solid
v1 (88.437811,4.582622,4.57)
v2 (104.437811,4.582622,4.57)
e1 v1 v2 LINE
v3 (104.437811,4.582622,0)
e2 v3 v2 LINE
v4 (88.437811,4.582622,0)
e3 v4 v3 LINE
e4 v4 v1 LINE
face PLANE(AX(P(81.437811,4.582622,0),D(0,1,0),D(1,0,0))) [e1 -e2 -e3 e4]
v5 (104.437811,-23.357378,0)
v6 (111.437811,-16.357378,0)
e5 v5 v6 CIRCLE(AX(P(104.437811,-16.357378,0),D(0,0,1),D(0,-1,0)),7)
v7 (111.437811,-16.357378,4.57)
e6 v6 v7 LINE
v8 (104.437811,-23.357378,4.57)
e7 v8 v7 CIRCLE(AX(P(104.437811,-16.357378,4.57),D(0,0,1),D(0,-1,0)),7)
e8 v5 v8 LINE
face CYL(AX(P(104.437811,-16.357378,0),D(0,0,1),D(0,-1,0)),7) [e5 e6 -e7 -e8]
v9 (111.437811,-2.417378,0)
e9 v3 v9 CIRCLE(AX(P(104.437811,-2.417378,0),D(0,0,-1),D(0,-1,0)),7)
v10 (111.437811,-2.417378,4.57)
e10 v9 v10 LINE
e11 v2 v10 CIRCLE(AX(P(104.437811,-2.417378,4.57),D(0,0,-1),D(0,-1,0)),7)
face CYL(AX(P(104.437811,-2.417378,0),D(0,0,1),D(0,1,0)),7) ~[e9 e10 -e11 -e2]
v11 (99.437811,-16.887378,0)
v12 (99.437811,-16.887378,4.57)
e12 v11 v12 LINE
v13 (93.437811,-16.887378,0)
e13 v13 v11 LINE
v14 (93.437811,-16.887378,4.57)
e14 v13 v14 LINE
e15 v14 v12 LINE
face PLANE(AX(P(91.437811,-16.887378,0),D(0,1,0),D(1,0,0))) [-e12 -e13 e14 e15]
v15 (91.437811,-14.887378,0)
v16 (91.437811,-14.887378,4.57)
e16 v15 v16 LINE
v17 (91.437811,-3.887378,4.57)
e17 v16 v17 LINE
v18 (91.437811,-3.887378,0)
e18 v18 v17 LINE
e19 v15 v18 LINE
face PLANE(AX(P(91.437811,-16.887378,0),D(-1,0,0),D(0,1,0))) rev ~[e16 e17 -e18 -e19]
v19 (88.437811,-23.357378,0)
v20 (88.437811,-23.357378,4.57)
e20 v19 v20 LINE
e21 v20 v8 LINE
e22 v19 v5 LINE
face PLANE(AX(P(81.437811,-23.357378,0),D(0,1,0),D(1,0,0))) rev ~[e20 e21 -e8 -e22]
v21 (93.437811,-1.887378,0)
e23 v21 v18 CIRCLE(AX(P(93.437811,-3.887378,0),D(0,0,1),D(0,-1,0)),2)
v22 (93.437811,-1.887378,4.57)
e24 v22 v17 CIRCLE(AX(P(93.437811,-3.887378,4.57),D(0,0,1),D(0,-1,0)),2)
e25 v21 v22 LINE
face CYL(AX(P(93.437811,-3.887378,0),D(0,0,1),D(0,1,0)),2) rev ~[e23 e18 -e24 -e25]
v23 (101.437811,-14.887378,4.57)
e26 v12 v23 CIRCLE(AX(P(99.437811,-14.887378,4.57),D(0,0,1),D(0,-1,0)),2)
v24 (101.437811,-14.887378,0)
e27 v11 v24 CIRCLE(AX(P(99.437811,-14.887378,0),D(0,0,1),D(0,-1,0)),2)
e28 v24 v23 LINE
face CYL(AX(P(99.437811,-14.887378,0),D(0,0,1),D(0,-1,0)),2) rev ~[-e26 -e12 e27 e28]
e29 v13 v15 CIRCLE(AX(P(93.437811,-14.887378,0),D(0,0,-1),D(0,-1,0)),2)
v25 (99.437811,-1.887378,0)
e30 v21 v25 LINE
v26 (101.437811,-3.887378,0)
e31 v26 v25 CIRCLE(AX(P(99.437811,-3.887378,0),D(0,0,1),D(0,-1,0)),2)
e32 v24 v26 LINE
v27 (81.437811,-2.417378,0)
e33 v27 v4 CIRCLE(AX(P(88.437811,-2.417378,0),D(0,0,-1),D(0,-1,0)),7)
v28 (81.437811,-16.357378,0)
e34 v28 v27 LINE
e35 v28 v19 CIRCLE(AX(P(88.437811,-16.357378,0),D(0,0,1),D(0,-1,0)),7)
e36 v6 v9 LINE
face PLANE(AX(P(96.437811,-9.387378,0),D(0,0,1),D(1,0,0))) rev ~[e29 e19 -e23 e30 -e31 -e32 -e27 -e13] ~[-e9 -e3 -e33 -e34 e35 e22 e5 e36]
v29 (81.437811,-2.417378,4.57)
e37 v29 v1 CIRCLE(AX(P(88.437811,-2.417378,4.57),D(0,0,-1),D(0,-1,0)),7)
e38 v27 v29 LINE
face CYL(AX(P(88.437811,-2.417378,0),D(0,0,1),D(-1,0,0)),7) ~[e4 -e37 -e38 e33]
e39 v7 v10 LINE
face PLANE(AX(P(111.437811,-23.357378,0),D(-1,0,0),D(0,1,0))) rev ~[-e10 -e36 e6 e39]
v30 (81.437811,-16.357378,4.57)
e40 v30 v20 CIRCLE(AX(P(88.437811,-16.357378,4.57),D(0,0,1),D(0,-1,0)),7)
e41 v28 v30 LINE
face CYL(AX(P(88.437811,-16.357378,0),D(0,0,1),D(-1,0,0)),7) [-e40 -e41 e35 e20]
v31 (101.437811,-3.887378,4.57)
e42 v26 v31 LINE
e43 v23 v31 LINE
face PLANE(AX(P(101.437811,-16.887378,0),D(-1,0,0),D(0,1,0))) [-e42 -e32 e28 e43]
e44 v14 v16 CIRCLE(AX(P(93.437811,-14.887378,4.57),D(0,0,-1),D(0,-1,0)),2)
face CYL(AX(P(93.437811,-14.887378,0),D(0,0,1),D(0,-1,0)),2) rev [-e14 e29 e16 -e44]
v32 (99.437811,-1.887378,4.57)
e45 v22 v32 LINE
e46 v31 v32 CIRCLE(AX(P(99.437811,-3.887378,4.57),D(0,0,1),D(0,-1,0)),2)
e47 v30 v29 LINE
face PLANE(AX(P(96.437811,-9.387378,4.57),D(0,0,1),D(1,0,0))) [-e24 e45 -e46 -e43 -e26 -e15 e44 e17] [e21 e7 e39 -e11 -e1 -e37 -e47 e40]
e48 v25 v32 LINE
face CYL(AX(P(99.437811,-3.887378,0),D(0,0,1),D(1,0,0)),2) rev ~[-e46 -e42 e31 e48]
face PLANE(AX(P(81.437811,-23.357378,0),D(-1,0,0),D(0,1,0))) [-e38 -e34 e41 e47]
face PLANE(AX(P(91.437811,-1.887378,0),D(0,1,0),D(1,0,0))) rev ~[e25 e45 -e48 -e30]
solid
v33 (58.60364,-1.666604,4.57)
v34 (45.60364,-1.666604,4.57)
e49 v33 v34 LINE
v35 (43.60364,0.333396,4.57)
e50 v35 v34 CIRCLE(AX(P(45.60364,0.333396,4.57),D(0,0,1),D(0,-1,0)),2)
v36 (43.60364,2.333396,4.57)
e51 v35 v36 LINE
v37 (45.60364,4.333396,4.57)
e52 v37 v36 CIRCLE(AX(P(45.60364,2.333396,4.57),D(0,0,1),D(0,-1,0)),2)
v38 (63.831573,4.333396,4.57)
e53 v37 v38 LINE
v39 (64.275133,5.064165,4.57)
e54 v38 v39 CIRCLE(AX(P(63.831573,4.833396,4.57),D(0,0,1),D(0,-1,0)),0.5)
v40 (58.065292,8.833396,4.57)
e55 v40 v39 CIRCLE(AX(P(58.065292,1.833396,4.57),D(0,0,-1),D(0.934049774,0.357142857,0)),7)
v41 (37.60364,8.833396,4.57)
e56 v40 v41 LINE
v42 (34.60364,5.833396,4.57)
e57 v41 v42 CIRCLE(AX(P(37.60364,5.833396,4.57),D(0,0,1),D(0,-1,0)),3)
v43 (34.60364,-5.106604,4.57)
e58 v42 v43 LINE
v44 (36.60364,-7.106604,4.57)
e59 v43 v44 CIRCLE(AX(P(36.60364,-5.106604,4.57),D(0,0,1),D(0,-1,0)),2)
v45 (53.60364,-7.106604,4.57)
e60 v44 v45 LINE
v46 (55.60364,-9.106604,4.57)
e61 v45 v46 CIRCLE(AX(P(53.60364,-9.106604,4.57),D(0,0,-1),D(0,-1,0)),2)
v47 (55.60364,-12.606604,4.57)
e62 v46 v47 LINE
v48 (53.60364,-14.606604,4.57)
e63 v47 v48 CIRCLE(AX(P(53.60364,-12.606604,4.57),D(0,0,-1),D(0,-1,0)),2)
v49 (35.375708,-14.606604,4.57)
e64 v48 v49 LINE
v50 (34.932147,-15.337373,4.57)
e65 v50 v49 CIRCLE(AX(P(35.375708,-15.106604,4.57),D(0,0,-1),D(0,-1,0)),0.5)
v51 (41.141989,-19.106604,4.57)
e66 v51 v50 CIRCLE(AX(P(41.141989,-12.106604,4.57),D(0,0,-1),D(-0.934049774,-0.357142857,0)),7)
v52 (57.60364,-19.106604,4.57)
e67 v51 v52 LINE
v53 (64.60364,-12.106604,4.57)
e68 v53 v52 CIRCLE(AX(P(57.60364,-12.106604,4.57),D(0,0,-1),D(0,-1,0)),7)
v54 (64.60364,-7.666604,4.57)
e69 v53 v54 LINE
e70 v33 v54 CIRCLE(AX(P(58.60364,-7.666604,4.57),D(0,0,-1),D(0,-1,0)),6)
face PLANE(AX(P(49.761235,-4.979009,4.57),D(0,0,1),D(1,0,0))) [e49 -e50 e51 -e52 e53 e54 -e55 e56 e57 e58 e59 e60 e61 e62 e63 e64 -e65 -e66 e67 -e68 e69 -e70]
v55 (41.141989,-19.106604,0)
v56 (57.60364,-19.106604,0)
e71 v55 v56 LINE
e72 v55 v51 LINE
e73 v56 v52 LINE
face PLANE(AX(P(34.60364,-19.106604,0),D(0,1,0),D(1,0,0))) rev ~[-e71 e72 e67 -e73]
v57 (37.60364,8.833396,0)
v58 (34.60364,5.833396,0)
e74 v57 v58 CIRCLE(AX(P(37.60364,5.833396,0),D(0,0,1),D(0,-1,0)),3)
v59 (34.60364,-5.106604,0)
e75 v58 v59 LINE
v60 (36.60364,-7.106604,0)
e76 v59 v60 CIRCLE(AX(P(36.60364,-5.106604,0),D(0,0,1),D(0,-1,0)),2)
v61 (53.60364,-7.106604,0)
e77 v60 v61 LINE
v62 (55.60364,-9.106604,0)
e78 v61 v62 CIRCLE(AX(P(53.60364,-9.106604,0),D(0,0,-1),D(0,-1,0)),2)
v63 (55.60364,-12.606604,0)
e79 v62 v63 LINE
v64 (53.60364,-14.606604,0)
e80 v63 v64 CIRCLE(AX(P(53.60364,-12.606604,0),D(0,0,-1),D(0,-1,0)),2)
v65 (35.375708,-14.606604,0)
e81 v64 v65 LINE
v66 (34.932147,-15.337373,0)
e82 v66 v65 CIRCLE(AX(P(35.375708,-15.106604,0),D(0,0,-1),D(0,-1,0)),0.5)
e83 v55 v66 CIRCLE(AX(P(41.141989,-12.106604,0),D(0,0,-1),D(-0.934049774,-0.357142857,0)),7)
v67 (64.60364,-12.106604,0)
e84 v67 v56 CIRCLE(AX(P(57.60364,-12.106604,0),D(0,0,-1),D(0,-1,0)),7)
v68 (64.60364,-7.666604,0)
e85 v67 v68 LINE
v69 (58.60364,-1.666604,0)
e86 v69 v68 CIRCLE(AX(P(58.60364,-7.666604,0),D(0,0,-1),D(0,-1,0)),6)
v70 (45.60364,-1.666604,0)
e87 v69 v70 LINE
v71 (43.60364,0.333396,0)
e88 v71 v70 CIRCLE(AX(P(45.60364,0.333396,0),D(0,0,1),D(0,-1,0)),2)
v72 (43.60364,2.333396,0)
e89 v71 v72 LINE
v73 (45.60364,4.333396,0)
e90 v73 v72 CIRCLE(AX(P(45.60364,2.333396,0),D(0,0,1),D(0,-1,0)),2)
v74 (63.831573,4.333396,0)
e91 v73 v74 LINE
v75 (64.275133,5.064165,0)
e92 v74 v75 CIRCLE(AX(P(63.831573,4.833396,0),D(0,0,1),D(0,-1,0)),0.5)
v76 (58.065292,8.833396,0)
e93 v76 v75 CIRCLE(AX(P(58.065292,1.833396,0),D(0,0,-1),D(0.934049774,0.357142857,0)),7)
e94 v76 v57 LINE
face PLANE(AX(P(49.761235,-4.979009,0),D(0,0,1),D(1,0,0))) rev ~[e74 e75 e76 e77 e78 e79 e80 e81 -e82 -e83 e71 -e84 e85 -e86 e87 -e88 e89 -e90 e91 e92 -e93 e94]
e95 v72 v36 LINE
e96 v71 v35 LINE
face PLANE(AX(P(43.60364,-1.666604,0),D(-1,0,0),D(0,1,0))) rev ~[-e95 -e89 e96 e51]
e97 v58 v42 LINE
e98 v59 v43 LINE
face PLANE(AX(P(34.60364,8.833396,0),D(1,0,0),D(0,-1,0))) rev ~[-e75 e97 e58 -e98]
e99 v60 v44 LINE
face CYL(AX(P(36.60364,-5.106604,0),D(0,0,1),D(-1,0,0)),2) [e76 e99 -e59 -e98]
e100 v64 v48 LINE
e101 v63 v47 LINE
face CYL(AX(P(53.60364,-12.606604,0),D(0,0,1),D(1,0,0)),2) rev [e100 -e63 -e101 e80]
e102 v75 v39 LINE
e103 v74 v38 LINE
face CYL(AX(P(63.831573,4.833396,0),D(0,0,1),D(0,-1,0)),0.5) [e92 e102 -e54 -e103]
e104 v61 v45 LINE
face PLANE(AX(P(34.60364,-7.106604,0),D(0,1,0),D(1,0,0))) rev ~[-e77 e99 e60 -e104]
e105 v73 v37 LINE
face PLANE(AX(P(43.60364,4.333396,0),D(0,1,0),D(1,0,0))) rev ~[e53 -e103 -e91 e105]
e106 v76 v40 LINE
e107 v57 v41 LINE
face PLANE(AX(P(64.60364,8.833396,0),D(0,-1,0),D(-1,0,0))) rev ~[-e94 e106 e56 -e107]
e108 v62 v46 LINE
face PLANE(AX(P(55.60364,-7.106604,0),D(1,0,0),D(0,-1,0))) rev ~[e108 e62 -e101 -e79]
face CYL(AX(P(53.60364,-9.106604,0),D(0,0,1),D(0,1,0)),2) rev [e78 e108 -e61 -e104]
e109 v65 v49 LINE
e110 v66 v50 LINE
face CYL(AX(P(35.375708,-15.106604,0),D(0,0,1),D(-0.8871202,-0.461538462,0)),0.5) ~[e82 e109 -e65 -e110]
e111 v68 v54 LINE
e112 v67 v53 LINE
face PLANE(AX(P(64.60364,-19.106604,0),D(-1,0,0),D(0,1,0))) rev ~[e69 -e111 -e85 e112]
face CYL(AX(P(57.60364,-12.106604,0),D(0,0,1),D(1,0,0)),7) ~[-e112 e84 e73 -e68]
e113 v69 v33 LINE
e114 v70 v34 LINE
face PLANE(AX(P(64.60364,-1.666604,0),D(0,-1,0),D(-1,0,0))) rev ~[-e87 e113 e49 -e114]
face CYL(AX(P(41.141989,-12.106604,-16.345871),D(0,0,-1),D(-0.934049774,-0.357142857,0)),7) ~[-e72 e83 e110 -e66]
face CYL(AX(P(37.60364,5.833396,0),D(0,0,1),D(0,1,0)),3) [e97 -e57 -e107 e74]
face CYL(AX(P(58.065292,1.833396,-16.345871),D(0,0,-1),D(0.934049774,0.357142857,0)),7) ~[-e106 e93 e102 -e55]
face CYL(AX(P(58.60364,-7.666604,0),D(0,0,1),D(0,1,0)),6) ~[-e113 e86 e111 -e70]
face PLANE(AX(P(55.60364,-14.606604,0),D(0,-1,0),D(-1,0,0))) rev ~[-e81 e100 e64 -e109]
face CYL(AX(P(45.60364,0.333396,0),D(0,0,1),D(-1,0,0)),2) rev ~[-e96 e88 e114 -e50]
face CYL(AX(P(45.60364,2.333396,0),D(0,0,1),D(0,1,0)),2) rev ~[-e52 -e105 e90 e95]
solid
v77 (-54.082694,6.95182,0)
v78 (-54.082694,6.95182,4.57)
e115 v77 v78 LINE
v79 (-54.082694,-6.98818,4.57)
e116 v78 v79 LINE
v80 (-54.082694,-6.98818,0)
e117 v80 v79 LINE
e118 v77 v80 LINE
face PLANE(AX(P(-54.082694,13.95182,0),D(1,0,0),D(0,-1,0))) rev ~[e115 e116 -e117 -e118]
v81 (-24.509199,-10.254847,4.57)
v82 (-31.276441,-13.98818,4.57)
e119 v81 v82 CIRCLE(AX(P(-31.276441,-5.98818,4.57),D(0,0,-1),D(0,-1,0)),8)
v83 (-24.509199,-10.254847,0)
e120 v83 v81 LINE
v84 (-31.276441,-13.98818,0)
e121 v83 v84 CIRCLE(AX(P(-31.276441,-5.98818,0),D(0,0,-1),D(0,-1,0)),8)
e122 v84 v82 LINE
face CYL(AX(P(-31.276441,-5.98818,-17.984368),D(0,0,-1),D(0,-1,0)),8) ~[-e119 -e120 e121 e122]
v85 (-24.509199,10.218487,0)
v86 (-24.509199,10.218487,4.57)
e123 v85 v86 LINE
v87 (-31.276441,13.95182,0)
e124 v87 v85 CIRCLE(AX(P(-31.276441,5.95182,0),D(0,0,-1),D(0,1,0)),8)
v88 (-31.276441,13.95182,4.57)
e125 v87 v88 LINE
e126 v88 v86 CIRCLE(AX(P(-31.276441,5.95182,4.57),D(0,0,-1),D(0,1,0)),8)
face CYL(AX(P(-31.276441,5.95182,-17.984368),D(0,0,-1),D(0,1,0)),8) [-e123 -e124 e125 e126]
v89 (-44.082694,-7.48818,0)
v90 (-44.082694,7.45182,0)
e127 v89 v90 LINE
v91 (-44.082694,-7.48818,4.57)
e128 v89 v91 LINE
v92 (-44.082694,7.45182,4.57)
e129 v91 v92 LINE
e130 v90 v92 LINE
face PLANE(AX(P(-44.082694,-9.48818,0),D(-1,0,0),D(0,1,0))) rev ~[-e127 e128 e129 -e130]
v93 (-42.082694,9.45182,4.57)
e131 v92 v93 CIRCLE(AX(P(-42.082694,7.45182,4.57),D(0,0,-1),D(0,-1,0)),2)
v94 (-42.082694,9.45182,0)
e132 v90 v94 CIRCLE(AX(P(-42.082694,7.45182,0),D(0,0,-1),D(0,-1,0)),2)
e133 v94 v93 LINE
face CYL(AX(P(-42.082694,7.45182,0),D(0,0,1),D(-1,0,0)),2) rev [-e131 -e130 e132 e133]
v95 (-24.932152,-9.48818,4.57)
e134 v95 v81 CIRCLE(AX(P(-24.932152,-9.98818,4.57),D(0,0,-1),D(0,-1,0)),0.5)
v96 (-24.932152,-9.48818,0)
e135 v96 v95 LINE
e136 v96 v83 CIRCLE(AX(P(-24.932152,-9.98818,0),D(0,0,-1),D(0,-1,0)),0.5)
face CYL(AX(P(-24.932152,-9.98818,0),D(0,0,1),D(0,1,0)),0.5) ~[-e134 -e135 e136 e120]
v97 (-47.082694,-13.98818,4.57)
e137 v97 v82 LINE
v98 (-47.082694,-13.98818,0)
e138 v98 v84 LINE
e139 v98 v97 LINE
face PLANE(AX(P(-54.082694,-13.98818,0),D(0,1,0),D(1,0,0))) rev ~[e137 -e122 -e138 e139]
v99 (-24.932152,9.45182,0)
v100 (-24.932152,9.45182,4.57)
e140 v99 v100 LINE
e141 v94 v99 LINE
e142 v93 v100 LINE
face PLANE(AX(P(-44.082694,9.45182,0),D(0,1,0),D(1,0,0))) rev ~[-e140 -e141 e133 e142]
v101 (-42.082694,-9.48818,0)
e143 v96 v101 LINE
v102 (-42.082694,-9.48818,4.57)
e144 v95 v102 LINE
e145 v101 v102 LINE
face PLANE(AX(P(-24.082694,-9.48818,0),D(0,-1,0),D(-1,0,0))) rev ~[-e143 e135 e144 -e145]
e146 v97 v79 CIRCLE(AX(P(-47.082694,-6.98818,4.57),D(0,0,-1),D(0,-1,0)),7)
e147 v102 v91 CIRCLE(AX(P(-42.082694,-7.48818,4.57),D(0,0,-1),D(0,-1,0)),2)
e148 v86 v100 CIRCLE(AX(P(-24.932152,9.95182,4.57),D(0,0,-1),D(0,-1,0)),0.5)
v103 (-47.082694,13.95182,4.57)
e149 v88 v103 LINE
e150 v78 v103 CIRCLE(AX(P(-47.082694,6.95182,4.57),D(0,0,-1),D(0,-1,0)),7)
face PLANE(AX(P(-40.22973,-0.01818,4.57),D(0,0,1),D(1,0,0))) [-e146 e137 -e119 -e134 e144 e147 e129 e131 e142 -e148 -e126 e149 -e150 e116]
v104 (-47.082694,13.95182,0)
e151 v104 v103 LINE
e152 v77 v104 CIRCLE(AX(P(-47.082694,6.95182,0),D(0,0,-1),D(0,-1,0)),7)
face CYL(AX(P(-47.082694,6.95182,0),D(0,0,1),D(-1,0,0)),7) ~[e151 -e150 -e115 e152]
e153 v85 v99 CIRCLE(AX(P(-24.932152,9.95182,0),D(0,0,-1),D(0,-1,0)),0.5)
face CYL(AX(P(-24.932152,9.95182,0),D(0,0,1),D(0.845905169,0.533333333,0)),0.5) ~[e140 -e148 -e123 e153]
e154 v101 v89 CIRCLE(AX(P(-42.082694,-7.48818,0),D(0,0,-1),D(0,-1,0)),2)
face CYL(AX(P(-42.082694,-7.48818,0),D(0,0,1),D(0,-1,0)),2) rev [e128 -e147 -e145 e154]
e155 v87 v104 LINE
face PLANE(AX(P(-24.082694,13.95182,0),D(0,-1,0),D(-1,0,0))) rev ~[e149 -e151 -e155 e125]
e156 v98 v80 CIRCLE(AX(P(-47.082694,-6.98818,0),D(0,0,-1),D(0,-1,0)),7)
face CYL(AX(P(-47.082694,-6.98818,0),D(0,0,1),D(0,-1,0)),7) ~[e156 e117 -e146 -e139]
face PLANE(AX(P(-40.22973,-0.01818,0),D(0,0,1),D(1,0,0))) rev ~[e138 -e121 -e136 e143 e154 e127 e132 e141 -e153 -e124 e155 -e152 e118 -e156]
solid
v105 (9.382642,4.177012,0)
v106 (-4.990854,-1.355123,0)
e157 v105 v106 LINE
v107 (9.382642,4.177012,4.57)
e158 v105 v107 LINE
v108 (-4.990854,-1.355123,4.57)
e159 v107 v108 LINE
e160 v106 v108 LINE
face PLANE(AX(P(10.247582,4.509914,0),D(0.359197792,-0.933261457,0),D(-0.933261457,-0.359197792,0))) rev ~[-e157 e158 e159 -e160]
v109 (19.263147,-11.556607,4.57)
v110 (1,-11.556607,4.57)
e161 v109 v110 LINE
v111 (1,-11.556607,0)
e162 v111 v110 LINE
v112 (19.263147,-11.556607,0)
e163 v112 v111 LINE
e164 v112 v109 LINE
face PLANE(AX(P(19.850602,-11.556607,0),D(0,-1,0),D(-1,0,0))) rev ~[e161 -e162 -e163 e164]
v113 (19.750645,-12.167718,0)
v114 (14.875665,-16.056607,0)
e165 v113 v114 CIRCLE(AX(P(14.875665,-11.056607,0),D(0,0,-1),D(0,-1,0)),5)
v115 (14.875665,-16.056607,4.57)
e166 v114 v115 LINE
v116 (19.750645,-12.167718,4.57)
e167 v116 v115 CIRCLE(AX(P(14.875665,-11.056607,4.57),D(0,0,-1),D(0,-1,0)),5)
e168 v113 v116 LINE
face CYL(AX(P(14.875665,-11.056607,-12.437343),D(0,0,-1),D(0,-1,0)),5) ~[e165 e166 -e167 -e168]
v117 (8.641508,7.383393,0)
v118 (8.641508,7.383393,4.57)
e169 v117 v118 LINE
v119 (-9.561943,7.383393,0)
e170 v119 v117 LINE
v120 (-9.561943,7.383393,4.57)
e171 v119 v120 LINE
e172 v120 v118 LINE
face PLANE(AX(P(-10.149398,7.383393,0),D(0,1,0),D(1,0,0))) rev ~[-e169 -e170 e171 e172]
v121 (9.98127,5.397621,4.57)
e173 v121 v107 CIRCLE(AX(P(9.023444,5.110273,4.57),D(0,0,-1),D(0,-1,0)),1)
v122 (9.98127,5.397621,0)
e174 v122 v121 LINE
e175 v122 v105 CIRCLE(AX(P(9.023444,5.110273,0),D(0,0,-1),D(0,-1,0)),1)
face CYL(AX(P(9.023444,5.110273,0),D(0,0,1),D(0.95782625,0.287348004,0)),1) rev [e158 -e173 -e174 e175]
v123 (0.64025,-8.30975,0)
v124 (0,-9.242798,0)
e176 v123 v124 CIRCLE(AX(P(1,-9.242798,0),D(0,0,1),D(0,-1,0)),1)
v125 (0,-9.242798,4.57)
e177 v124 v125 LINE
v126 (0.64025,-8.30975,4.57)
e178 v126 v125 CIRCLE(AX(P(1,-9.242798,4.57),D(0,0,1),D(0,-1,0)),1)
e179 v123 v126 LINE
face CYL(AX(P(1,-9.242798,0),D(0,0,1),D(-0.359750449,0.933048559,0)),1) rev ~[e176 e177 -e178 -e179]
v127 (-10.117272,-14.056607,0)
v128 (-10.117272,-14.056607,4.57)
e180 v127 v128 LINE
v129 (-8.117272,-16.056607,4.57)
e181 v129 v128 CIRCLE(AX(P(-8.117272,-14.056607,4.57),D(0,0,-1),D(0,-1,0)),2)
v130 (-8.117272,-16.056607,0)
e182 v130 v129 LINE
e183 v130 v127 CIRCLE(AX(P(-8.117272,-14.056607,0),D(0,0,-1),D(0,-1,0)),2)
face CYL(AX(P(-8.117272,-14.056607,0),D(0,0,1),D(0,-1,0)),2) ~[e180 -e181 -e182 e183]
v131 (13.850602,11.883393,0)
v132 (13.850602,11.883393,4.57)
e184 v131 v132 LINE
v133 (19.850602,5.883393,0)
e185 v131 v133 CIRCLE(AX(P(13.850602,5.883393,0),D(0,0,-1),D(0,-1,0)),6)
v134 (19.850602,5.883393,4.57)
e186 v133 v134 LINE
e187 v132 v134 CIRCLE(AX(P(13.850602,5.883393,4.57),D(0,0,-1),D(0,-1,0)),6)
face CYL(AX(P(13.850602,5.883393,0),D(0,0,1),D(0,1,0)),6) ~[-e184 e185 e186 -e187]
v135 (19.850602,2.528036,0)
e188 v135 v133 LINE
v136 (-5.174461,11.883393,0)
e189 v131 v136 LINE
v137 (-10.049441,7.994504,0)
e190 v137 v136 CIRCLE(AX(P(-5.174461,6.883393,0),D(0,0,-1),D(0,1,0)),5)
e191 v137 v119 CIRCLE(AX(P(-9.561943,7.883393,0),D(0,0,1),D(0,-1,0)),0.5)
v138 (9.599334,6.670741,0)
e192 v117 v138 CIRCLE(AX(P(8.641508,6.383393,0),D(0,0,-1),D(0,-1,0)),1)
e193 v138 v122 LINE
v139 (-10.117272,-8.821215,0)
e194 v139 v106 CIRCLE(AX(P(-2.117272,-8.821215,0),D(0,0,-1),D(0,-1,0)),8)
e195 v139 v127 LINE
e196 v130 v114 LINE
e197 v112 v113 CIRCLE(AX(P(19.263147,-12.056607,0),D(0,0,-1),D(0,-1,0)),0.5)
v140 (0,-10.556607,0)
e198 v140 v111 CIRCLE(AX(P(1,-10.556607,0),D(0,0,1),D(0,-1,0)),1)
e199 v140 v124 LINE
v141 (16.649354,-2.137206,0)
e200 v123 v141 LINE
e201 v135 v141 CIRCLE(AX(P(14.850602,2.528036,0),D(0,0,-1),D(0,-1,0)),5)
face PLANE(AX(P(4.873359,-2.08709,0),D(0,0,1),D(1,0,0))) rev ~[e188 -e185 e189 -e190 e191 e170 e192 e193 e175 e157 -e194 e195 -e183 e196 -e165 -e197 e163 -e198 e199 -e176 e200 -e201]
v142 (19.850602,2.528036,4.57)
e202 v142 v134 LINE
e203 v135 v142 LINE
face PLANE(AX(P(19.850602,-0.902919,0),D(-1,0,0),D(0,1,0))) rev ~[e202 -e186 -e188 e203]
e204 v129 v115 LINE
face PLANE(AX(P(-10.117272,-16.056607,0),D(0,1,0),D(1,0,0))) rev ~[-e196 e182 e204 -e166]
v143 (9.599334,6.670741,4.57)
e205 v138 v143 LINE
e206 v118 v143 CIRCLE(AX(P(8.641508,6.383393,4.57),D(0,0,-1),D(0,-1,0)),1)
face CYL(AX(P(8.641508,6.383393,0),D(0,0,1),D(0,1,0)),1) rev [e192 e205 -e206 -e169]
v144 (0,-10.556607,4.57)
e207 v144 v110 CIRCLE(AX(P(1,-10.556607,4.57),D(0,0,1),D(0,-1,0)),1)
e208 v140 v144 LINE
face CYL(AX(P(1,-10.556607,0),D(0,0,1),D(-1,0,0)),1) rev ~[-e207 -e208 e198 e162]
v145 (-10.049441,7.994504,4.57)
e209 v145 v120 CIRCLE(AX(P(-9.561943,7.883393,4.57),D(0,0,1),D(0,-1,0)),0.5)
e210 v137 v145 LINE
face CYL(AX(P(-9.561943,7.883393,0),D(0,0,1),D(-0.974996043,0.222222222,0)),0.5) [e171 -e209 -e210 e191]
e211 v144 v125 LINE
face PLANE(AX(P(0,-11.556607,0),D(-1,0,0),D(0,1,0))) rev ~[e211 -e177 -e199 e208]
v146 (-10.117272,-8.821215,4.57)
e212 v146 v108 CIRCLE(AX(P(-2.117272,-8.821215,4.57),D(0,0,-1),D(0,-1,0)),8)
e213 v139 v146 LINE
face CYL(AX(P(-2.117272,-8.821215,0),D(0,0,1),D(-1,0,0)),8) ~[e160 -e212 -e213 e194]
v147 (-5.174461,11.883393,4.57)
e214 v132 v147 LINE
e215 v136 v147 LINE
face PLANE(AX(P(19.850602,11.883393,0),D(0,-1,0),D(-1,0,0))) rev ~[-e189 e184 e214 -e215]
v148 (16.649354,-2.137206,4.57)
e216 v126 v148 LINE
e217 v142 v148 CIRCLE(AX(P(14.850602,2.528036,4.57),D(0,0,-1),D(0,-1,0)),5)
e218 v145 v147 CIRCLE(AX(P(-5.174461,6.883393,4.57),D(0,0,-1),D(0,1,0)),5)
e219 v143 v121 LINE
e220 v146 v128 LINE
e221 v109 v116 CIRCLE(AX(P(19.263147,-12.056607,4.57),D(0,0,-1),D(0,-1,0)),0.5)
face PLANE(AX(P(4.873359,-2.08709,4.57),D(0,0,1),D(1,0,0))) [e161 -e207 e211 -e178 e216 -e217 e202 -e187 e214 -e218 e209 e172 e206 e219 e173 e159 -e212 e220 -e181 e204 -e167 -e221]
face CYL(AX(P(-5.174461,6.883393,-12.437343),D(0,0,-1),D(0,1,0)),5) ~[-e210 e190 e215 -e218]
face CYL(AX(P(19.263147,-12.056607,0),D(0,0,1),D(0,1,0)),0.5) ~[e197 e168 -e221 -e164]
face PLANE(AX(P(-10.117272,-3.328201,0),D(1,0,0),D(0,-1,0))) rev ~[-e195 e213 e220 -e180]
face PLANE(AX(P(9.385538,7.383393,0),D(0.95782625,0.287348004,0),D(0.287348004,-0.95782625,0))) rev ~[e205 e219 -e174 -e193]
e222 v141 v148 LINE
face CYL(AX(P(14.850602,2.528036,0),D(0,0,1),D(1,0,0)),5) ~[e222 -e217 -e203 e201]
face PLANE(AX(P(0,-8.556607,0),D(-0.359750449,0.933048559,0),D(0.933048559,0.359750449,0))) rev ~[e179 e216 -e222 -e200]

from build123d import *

# Parameters (mm, degrees)
F1_DEPTH     = 4.57
F2_R         = 2
F3_R         = 7
F4_T1_DEPTH  = 40.5387364248
F5_R         = 0.5
F7_DEPTH     = 4.57
F8_T1_DEPTH  = 29.4446859277
F9_R         = 5
F10_R        = 1
F11_R        = 0.5
F12_R        = 2
F13_R        = 8
F14_R        = 6
F16_DEPTH    = 4.57
F17_T1_DEPTH = 37.2617420766
F18_R        = 0.5
F19_R        = 2
F20_R        = 3
F21_R        = 2
F22_R        = 6
F23_R        = 7
F24_W        = 30
F24_H        = 27.94
F24_W_2      = 10
F24_H_2      = 15
F25_DEPTH    = 4.57
F26_R        = 7
F27_R        = 2


# Not quite as in the source:
# - a fillet or chamfer that OpenCascade refuses, or shapes differently, is made with other operations: its cross-section is extruded or revolved along the edge and cut away or added


with BuildPart() as f1:
    # F0 (on Top) → F1 (new body)
    with BuildSketch(Plane.XY):
        Polygon((-24.0826935321, 9.451819914), (-24.0826935321, 13.951819914), (-54.0826935321, 13.951819914), (-54.0826935321, -13.988180086), (-24.0826935321, -13.988180086), (-24.0826935321, -9.488180086), (-44.0826935321, -9.488180086), (-44.0826935321, 9.451819914), align=None)
    extrude(amount=F1_DEPTH)

    # F2
    f2_edges = [f1.edges().sort_by_distance(p)[0] for p in [
        (-44.082694, 9.45182, 2.285),
        (-44.082694, -9.48818, 2.285),
    ]]
    fillet(f2_edges, radius=F2_R)

    # F3
    f3_edges = [f1.edges().sort_by_distance(p)[0] for p in [
        (-54.082694, 13.95182, 2.285),
        (-54.082694, -13.98818, 2.285),
    ]]
    fillet(f3_edges, radius=F3_R)

    # F4: fillet of radius 8 on 2 edges, made by hand

    # F4_s2 → F4_t1 (cut)
    with BuildSketch(Plane.XY.offset(-17.9843682124)):
        with BuildLine():
            ThreePointArc((-31.2764408171, -13.988180086), (-27.03380013, -12.7705100691), (-24.0826935321, -9.488180086))
            Line((-24.0826935321, -9.488180086), (-24.0826935321, -13.988180086))
            Line((-24.0826935321, -13.988180086), (-31.2764408171, -13.988180086))
        make_face()
        with BuildLine():
            ThreePointArc((-31.2764408171, 13.951819914), (-27.03380013, 12.7341498971), (-24.0826935321, 9.451819914))
            Line((-24.0826935321, 9.451819914), (-24.0826935321, 13.951819914))
            Line((-24.0826935321, 13.951819914), (-31.2764408171, 13.951819914))
        make_face()
    extrude(amount=F4_T1_DEPTH, mode=Mode.SUBTRACT)

    # F5
    f5_edges = [f1.edges().sort_by_distance(p)[0] for p in [
        (-24.082694, -9.48818, 2.285),
        (-24.082694, 9.45182, 2.285),
    ]]
    fillet(f5_edges, radius=F5_R)


with BuildPart() as f7:
    # F6 (on Top) → F7 (new body)
    with BuildSketch(Plane.XY):
        Polygon((19.8506022431, 11.8833926581), (-10.1493977569, 11.8833926581), (-10.1493977569, 7.3833926581), (9.3855382875, 7.3833926581), (10.2475822992, 4.5099139089), (-10.1172720553, -3.3282011872), (-10.1172720553, -16.0566073419), (19.8506022431, -16.0566073419), (19.8506022431, -11.5566073419), (0, -11.5566073419), (0, -8.5566073419), (19.8506022431, -0.9029187956), align=None)
    extrude(amount=F7_DEPTH)

    # F8: fillet of radius 5 on 2 edges, made by hand

    # F8_s2 → F8_t1 (cut)
    with BuildSketch(Plane.XY.offset(-12.4373429638)):
        with BuildLine():
            ThreePointArc((14.8756650576, -16.0566073419), (18.2297670238, -14.7647065855), (19.8506022431, -11.5566073419))
            Line((19.8506022431, -11.5566073419), (19.8506022431, -16.0566073419))
            Line((19.8506022431, -16.0566073419), (14.8756650576, -16.0566073419))
        make_face()
        with BuildLine():
            ThreePointArc((-5.1744605714, 11.8833926581), (-8.5285625376, 10.5914919016), (-10.1493977569, 7.3833926581))
            Line((-10.1493977569, 7.3833926581), (-10.1493977569, 11.8833926581))
            Line((-10.1493977569, 11.8833926581), (-5.1744605714, 11.8833926581))
        make_face()
    extrude(amount=F8_T1_DEPTH, mode=Mode.SUBTRACT)

    # F9
    f9_edges = [f7.edges().sort_by_distance(p)[0] for p in [
        (19.850602, -0.902919, 2.285),
    ]]
    fillet(f9_edges, radius=F9_R)

    # F10
    f10_edges = [f7.edges().sort_by_distance(p)[0] for p in [
        (9.385538, 7.383393, 2.285),
        (10.247582, 4.509914, 2.285),
        (0, -8.556607, 2.285),
        (0, -11.556607, 2.285),
    ]]
    fillet(f10_edges, radius=F10_R)

    # F11
    f11_edges = [f7.edges().sort_by_distance(p)[0] for p in [
        (-10.149398, 7.383393, 2.285),
        (19.850602, -11.556607, 2.285),
    ]]
    fillet(f11_edges, radius=F11_R)

    # F12
    f12_edges = [f7.edges().sort_by_distance(p)[0] for p in [
        (-10.117272, -16.056607, 2.285),
    ]]
    fillet(f12_edges, radius=F12_R)

    # F13
    f13_edges = [f7.edges().sort_by_distance(p)[0] for p in [
        (-10.117272, -3.328201, 2.285),
    ]]
    fillet(f13_edges, radius=F13_R)

    # F14
    f14_edges = [f7.edges().sort_by_distance(p)[0] for p in [
        (19.850602, 11.883393, 2.285),
    ]]
    fillet(f14_edges, radius=F14_R)


with BuildPart() as f16:
    # F15 (on Top) → F16 (new body)
    with BuildSketch(Plane.XY):
        Polygon((64.6036404371, 4.3333959766), (64.6036404371, 8.8333959766), (34.6036404371, 8.8333959766), (34.6036404371, -7.1066040234), (55.6036404371, -7.1066040234), (55.6036404371, -14.6066040234), (34.6036404371, -14.6066040234), (34.6036404371, -19.1066040234), (64.6036404371, -19.1066040234), (64.6036404371, -1.6666040234), (43.6036404371, -1.6666040234), (43.6036404371, 4.3333959766), align=None)
    extrude(amount=F16_DEPTH)

    # F17: fillet of radius 7 on 2 edges, made by hand

    # F17_s2 → F17_t1 (cut)
    with BuildSketch(Plane.XY.offset(-16.3458710383)):
        with BuildLine():
            ThreePointArc((34.6036404371, -14.6066040234), (37.1733618858, -17.8728853208), (41.1419888524, -19.1066040234))
            Line((41.1419888524, -19.1066040234), (34.6036404371, -19.1066040234))
            Line((34.6036404371, -19.1066040234), (34.6036404371, -14.6066040234))
        make_face()
        with BuildLine():
            ThreePointArc((64.6036404371, 4.3333959766), (62.0339189884, 7.5996772739), (58.0652920218, 8.8333959766))
            Line((58.0652920218, 8.8333959766), (64.6036404371, 8.8333959766))
            Line((64.6036404371, 8.8333959766), (64.6036404371, 4.3333959766))
        make_face()
    extrude(amount=F17_T1_DEPTH, mode=Mode.SUBTRACT)

    # F18
    f18_edges = [f16.edges().sort_by_distance(p)[0] for p in [
        (34.60364, -14.606604, 2.285),
        (64.60364, 4.333396, 2.285),
    ]]
    fillet(f18_edges, radius=F18_R)

    # F19
    f19_edges = [f16.edges().sort_by_distance(p)[0] for p in [
        (55.60364, -7.106604, 2.285),
        (55.60364, -14.606604, 2.285),
        (43.60364, -1.666604, 2.285),
        (43.60364, 4.333396, 2.285),
    ]]
    fillet(f19_edges, radius=F19_R)

    # F20
    f20_edges = [f16.edges().sort_by_distance(p)[0] for p in [
        (34.60364, 8.833396, 2.285),
    ]]
    fillet(f20_edges, radius=F20_R)

    # F21
    f21_edges = [f16.edges().sort_by_distance(p)[0] for p in [
        (34.60364, -7.106604, 2.285),
    ]]
    fillet(f21_edges, radius=F21_R)

    # F22
    f22_edges = [f16.edges().sort_by_distance(p)[0] for p in [
        (64.60364, -1.666604, 2.285),
    ]]
    fillet(f22_edges, radius=F22_R)

    # F23
    f23_edges = [f16.edges().sort_by_distance(p)[0] for p in [
        (64.60364, -19.106604, 2.285),
    ]]
    fillet(f23_edges, radius=F23_R)


with BuildPart() as f25:
    # F24 (on Top) → F25 (new body)
    with BuildSketch(Plane.XY):
        with Locations((96.4378112555, -9.3873783189)):
            Rectangle(F24_W, F24_H)
        with Locations((96.4378112555, -9.3873783189)):
            Rectangle(F24_W_2, F24_H_2, mode=Mode.SUBTRACT)
    extrude(amount=F25_DEPTH)

    # F26
    f26_edges = [f25.edges().sort_by_distance(p)[0] for p in [
        (81.437811, -23.357378, 2.285),
        (111.437811, -23.357378, 2.285),
        (111.437811, 4.582622, 2.285),
        (81.437811, 4.582622, 2.285),
    ]]
    fillet(f26_edges, radius=F26_R)

    # F27
    f27_edges = [f25.edges().sort_by_distance(p)[0] for p in [
        (91.437811, -1.887378, 2.285),
        (101.437811, -1.887378, 2.285),
        (101.437811, -16.887378, 2.285),
        (91.437811, -16.887378, 2.285),
    ]]
    fillet(f27_edges, radius=F27_R)


solid = Compound([f1.part, f7.part, f16.part, f25.part])
